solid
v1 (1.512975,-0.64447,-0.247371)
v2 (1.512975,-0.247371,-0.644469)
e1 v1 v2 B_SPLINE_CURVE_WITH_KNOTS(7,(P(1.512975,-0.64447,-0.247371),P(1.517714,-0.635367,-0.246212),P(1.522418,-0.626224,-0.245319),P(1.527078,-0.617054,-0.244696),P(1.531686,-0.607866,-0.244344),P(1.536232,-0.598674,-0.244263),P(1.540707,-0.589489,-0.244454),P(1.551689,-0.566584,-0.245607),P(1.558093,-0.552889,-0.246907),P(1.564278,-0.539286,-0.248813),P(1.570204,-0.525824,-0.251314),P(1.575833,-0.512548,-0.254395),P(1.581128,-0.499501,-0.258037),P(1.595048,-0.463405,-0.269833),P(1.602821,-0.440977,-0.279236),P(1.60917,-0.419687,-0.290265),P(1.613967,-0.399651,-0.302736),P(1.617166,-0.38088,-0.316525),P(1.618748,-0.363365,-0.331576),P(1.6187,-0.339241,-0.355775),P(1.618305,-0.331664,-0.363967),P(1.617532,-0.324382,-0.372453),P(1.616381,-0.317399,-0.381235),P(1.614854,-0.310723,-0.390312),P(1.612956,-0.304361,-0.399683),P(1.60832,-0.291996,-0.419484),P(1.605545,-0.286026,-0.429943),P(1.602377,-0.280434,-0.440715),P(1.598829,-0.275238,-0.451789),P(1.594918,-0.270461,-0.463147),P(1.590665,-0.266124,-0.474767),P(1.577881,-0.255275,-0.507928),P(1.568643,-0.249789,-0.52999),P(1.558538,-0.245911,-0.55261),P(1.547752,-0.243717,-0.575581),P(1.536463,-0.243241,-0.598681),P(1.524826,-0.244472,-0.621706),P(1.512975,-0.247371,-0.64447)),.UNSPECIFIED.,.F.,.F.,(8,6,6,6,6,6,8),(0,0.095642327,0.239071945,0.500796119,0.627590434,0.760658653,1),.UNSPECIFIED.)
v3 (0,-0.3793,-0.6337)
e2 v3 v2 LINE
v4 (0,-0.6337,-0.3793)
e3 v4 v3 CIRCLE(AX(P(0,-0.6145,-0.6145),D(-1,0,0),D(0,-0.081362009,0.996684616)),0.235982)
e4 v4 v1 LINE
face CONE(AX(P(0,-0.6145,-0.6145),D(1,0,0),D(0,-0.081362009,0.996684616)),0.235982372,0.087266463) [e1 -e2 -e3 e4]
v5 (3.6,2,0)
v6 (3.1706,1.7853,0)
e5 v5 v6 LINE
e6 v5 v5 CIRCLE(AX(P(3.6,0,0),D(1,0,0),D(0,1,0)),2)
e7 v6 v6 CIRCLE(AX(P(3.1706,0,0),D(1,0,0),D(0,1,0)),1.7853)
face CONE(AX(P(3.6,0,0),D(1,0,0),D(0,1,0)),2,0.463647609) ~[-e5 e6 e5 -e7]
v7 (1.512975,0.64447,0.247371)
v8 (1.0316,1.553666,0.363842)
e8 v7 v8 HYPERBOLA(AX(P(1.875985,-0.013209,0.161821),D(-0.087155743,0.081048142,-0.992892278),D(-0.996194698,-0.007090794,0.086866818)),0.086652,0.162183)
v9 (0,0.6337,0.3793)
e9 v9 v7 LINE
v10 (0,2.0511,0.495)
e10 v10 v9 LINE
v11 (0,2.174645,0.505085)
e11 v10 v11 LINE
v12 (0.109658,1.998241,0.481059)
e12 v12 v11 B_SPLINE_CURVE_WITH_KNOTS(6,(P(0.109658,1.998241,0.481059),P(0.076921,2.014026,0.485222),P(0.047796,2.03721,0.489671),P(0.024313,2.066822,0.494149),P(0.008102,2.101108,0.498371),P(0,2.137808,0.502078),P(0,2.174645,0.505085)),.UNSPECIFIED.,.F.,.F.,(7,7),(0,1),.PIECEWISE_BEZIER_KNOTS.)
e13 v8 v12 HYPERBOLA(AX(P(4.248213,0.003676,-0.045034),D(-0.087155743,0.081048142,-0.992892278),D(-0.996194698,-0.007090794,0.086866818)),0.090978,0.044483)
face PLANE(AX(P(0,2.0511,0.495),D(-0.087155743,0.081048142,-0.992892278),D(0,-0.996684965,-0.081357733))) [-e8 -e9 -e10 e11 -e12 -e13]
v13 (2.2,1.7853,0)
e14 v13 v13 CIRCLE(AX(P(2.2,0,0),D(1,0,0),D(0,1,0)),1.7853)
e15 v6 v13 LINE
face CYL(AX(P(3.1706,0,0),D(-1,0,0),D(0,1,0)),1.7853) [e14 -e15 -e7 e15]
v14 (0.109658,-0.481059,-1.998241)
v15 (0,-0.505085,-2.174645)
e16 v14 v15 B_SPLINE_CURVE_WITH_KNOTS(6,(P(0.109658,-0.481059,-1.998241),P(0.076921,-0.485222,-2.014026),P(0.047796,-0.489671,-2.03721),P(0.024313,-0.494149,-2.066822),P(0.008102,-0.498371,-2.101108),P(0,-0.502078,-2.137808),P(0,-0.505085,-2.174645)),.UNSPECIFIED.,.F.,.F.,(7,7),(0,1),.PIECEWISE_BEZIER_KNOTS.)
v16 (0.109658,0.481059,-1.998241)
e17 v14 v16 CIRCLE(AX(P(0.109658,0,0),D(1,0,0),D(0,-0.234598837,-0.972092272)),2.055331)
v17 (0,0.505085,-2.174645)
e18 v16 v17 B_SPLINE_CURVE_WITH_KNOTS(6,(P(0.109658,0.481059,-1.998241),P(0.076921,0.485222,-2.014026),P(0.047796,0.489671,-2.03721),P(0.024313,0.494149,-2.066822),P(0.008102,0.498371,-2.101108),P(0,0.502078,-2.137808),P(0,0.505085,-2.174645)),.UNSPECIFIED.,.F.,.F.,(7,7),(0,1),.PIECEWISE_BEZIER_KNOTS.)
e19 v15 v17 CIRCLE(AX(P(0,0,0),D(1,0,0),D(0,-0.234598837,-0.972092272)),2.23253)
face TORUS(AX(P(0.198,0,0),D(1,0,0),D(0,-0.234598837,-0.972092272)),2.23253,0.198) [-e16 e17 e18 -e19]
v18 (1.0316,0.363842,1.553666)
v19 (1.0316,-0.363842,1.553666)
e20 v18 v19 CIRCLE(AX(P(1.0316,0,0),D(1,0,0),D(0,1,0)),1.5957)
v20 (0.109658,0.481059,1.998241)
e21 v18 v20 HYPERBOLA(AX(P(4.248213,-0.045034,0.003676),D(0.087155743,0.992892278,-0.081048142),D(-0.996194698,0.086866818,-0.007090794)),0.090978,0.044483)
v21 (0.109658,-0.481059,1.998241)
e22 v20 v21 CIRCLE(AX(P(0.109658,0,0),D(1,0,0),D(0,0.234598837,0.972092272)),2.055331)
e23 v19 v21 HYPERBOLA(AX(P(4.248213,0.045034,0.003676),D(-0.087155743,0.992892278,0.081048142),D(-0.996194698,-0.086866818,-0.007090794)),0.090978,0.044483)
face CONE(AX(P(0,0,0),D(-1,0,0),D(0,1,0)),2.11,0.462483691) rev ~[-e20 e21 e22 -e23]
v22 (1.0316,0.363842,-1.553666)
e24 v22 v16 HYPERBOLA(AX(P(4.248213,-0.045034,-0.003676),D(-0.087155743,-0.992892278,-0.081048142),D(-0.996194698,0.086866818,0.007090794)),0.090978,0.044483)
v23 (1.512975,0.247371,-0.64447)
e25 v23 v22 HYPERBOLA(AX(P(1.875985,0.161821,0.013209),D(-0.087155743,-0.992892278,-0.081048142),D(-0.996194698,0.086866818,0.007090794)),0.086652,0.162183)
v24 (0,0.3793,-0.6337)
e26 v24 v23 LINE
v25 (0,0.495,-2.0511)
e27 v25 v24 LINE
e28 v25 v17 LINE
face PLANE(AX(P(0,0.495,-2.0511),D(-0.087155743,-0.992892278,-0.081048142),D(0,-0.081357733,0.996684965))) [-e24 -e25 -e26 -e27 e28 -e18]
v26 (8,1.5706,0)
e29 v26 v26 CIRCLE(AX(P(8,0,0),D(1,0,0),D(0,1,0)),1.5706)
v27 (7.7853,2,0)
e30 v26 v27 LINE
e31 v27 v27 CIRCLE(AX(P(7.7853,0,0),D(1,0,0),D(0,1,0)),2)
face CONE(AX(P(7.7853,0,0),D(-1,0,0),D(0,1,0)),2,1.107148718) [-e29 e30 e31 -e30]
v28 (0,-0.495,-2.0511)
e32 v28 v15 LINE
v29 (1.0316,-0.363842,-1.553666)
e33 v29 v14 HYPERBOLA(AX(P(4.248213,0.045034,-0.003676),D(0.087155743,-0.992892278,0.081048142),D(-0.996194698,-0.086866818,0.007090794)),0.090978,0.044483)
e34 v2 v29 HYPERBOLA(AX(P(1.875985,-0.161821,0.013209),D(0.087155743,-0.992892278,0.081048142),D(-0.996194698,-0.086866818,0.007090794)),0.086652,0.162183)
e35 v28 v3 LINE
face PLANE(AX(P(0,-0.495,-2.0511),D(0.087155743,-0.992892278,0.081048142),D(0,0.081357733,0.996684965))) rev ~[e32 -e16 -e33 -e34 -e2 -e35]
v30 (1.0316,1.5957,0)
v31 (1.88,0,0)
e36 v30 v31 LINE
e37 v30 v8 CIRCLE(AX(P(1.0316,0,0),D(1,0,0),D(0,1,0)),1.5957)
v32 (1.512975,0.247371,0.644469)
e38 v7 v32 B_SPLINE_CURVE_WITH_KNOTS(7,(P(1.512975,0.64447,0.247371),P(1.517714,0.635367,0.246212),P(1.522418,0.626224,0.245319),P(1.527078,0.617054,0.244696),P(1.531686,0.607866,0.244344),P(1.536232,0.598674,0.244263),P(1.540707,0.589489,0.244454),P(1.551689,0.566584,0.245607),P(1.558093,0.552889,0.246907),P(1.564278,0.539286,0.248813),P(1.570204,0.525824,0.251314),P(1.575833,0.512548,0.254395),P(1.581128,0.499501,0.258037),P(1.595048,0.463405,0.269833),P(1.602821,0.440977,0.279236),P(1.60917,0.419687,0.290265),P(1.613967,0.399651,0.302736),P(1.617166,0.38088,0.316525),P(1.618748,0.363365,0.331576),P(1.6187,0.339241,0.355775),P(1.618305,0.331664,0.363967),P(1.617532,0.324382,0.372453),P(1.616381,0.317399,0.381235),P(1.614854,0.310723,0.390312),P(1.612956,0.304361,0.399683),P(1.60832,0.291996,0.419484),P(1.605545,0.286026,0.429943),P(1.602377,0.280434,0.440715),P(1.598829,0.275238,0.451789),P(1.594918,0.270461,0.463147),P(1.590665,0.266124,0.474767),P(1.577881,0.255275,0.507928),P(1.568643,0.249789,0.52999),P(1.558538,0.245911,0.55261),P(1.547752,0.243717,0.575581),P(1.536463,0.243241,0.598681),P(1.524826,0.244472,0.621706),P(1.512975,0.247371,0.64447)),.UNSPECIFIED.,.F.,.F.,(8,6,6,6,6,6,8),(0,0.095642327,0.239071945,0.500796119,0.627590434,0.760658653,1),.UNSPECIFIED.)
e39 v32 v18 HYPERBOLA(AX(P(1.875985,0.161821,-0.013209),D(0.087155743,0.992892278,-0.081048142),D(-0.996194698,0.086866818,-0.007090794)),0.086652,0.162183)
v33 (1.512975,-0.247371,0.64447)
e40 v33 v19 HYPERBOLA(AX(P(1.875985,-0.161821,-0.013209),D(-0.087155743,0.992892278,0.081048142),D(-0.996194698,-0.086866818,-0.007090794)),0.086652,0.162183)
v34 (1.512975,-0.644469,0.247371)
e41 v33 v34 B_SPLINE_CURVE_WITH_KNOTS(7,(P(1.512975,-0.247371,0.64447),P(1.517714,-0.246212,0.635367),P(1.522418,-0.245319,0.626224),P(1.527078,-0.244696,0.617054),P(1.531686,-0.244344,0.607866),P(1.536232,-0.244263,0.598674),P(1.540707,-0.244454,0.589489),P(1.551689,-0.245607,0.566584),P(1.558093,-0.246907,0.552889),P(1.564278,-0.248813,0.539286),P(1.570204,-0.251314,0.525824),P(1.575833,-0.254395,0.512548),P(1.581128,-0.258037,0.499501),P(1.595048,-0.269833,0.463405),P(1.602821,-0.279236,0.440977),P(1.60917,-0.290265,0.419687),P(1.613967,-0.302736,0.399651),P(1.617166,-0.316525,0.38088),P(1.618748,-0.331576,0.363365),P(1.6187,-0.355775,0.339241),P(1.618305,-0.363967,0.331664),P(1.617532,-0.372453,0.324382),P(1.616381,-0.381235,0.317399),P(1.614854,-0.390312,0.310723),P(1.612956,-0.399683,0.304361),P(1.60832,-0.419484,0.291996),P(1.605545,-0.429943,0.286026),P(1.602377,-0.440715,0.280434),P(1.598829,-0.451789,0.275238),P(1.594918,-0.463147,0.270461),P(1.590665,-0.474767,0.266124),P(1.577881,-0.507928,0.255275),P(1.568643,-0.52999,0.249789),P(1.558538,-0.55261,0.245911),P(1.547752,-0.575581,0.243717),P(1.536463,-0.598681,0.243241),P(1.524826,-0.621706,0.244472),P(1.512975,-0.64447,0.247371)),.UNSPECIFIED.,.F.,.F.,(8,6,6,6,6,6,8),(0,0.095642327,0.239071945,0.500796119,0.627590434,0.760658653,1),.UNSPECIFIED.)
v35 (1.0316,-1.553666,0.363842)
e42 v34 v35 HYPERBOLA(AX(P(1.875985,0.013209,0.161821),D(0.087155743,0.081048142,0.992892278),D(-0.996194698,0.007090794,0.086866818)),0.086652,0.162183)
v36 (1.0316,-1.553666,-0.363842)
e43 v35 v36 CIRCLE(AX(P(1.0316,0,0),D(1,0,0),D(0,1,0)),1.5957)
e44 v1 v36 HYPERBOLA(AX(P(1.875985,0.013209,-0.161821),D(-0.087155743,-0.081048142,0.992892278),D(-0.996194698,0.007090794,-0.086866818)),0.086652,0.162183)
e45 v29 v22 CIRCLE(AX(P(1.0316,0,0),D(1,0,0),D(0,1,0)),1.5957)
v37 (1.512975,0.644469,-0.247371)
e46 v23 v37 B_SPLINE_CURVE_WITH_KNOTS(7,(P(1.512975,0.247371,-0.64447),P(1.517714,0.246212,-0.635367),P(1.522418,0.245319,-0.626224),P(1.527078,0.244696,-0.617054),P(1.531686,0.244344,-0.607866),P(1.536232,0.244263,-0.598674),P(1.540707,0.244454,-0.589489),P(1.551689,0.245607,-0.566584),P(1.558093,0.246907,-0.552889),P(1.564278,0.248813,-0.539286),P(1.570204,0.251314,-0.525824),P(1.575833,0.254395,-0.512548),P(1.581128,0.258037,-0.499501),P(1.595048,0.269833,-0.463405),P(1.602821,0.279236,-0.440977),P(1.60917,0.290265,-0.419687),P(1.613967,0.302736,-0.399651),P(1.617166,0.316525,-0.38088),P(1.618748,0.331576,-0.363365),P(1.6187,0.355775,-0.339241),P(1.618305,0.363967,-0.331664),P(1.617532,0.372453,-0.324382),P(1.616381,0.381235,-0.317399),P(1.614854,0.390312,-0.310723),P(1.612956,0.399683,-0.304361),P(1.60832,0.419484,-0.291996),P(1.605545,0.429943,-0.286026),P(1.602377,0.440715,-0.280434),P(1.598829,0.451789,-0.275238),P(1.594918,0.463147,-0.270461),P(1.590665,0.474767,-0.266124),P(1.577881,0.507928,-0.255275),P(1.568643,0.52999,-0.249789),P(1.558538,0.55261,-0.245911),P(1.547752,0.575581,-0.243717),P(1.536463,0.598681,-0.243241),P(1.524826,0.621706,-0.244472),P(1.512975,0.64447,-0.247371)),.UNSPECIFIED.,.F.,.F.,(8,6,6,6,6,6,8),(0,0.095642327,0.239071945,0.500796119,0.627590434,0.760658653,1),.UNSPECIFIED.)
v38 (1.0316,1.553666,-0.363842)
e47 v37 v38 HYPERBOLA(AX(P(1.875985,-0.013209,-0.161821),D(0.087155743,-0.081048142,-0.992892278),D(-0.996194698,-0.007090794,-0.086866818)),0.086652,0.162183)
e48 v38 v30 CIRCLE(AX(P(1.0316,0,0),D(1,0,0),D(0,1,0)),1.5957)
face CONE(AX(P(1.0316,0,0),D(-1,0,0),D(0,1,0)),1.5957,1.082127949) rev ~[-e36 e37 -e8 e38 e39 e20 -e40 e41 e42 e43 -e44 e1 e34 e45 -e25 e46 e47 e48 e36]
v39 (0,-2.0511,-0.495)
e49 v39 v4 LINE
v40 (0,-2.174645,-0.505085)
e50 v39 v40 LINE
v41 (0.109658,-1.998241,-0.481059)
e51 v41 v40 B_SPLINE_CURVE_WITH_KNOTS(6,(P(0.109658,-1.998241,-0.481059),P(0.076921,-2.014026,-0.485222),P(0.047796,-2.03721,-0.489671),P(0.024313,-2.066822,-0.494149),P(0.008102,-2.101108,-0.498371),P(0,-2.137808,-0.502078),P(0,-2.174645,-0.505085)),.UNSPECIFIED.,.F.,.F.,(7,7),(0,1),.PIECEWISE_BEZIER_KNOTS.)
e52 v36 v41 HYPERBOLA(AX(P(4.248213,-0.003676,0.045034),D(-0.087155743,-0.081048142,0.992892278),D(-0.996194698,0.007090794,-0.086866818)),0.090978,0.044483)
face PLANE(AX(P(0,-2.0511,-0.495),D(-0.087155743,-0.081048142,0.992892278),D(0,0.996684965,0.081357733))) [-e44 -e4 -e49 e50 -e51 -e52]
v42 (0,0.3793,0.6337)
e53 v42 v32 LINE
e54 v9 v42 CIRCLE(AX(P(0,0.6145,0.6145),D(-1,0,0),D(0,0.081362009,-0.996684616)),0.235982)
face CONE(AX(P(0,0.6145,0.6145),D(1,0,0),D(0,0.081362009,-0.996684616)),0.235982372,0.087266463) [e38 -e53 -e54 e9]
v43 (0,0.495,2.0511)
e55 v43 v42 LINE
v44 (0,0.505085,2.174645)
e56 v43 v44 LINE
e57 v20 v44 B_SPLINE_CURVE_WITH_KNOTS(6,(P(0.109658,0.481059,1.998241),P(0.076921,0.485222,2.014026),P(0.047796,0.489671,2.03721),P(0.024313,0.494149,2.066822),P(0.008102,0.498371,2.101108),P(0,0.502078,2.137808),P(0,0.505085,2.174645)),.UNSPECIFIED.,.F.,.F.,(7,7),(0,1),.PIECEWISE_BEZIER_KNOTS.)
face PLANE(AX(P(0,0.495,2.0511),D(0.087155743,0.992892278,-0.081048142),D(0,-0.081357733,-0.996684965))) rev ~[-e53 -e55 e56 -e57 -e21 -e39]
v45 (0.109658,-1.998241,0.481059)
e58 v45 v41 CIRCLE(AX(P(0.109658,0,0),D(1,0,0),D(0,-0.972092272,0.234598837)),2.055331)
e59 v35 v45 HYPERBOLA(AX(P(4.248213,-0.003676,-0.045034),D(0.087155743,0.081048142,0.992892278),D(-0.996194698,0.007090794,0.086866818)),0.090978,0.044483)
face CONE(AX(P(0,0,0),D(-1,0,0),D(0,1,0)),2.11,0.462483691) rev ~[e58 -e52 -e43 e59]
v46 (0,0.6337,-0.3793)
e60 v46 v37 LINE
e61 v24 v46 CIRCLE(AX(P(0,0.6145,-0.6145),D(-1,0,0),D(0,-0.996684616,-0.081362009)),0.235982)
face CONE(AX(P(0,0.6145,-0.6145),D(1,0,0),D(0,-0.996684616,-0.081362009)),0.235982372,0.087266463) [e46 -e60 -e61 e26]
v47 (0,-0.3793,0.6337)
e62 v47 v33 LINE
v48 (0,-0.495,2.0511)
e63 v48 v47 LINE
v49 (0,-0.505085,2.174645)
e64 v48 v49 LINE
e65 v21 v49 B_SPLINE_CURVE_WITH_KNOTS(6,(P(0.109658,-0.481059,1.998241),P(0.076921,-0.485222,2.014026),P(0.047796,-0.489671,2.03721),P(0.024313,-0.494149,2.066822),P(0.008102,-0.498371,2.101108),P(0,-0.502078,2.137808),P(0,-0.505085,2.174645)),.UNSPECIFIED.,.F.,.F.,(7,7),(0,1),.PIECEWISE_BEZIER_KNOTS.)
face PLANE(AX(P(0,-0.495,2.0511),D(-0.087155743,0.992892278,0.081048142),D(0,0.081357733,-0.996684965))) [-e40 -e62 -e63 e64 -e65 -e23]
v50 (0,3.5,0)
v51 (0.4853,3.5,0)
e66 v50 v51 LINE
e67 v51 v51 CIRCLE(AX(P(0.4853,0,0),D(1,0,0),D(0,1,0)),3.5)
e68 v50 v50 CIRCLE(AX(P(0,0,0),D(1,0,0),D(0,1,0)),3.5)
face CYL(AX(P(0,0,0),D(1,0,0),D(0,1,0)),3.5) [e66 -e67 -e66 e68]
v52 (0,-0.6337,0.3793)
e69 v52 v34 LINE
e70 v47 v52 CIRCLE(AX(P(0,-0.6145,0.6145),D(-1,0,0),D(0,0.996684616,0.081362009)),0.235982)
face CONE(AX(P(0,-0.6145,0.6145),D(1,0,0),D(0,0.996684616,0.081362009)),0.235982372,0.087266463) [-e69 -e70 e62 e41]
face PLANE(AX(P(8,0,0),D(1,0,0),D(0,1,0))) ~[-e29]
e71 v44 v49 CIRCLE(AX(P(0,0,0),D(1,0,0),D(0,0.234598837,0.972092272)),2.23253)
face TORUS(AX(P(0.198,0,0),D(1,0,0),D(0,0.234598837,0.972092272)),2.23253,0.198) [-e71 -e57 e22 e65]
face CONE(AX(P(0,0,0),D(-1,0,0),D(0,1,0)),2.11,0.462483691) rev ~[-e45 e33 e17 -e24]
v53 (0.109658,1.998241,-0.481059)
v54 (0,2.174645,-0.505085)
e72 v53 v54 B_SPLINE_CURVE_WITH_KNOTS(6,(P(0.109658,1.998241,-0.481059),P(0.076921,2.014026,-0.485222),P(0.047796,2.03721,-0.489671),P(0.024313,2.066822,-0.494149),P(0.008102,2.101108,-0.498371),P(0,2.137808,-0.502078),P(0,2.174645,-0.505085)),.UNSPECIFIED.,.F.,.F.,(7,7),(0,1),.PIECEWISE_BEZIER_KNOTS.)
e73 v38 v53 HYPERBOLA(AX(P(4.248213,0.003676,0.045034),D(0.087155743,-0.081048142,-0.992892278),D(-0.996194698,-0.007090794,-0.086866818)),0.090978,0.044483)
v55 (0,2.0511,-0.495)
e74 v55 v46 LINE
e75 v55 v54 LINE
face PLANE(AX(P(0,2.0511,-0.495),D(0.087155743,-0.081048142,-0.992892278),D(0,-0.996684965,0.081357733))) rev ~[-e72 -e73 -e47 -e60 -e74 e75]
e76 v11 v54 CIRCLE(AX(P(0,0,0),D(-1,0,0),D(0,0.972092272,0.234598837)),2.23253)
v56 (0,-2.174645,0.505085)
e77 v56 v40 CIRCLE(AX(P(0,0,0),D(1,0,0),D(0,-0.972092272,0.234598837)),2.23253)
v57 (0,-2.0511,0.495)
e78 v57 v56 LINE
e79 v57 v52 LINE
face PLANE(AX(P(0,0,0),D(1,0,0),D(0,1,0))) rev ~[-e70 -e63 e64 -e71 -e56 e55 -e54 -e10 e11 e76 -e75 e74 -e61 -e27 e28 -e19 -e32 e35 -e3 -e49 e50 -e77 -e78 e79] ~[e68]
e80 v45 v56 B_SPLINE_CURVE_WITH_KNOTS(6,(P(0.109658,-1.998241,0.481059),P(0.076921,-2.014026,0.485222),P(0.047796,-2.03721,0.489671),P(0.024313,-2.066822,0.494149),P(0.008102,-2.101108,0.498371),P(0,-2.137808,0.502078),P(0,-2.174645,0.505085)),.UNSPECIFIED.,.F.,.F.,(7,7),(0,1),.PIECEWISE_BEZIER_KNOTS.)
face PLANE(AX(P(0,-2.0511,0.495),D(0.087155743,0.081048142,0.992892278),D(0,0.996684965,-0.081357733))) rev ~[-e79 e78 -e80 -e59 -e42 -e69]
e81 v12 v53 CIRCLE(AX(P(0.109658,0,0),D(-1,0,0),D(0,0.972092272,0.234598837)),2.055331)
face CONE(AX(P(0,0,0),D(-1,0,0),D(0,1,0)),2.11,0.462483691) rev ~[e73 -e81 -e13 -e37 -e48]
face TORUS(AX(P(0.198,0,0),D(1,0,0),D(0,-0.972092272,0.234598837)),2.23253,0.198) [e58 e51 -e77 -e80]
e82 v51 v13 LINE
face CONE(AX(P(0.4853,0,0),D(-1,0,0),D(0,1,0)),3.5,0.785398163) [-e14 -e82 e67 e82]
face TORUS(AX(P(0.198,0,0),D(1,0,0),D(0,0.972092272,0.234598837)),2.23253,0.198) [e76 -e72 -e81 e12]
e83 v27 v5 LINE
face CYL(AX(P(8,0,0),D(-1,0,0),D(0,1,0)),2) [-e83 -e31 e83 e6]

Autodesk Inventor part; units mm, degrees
ref_plane "YZ Plane" through (0, 0, 0) normal (1, 0, 0) x (0, 1, 0)
ref_plane "XZ Plane" through (0, 0, 0) normal (0, 1, 0) x (-1, 0, 0)
sketch "Sketch1" plane through (0, 0, 0) normal (0, 0, 1) x (1, 0, 0)
  line L0 (1.88, 0) -> (8, 0)
  line L1 (8, 0) -> (8, 2)
  line L2 (8, 2) -> (3.6, 2)
  line L3 (3.6, 2) -> (3.1706, 1.7853)
  line L4 (3.1706, 1.7853) -> (2.2, 1.7853)
  line L5 (0, 3.5) -> (0, 2.11)
  line L6 (0, 2.11) -> (1.0316, 1.5957)
  line L7 (1.0316, 1.5957) -> (1.88, 0)
  line L8 (-1.6, 0) -> (9.6, 0) projected
  line L9 (0, -0.7) -> (0, 4.2) projected
  line L10 (0, 3.5) -> (0.4853, 3.5)
  line L11 (0.4853, 3.5) -> (2.2, 1.7853)
  line L12 (3.6, 2) -> (1.9853, 2) construction
  dimension "d1" = 4.4
  dimension "d2" = 4
  dimension "d3" = 3.5706
  dimension "d4" = 4.22
  dimension "d5" = 26.5
  dimension "d6" = 62
  dimension "d7" = 1.88
  dimension "d8" = 0.4294
  dimension "d12" = 7
  dimension "d13" = 45
  dimension "d15" = 8
  dimension "d24" = 2.2
revolve "Body" add sketch "Sketch1" angle 360 about axis through (1.88, 0, 0) along (1, 0, 0) contours L7 L6 L5 L10 L11 L4 L3 L2 L1 L0
sketch "Sketch2" plane through (0, 0, 0) normal (-1, 0, 0) x (0, 0, 1)
  line L0 (0, 2.11) -> (0, 0) construction
  line L1 (0, 0) -> (2.11, 0) construction
  arc A0 (0.633, 0) -> (0, 0.633) centre (0, 0) ccw construction
  arc A1 (0.7385, 0) -> (0, 0.7385) centre (0, 0) ccw construction
  arc A2 (2.0511, 0.495) -> (0.495, 2.0511) centre (0, 0) ccw
  line L2 (0, 0) -> (1.492, 1.492) construction
  line L3 (0.495, 2.0511) -> (0.3793, 0.6337)
  line L4 (2.0511, 0.495) -> (0.6337, 0.3793)
  arc A3 (0.495, 2.0511) -> (0, 2.11) centre (0, 0) ccw
  arc A4 (2.11, 0) -> (2.0511, 0.495) centre (0, 0) ccw
  line L5 (0, -4.9) -> (0, 4.9) projected
  line L6 (-4.9, 0) -> (4.9, 0) projected
  arc A5 (0.495, -2.0511) -> (2.0511, -0.495) centre (0, 0) ccw
  line L7 (0.495, -2.0511) -> (0.3793, -0.6337)
  line L8 (2.0511, -0.495) -> (0.6337, -0.3793)
  arc A6 (0, -2.11) -> (0.495, -2.0511) centre (0, 0) ccw
  arc A7 (2.0511, -0.495) -> (2.11, 0) centre (0, 0) ccw
  arc A8 (-0.495, 2.0511) -> (-2.0511, 0.495) centre (0, 0) ccw
  line L9 (-0.495, 2.0511) -> (-0.3793, 0.6337)
  line L10 (-2.0511, 0.495) -> (-0.6337, 0.3793)
  arc A9 (0, 2.11) -> (-0.495, 2.0511) centre (0, 0) ccw
  arc A10 (-2.0511, 0.495) -> (-2.11, 0) centre (0, 0) ccw
  arc A11 (-0.495, -2.0511) -> (0, -2.11) centre (0, 0) ccw
  arc A12 (-2.0511, -0.495) -> (-0.495, -2.0511) centre (0, 0) ccw
  arc A13 (-2.11, 0) -> (-2.0511, -0.495) centre (0, 0) ccw
  line L11 (-2.0511, -0.495) -> (-0.6337, -0.3793)
  line L12 (-0.495, -2.0511) -> (-0.3793, -0.6337)
  arc A14 (0.3793, 0.6337) -> (0.6337, 0.3793) centre (0.6145, 0.6145) ccw
  arc A15 (0.6337, -0.3793) -> (0.3793, -0.6337) centre (0.6145, -0.6145) ccw
  arc A16 (-0.6337, 0.3793) -> (-0.3793, 0.6337) centre (-0.6145, 0.6145) ccw
  arc A17 (-0.3793, -0.6337) -> (-0.6337, -0.3793) centre (-0.6145, -0.6145) ccw
  point P0 (1.492, -1.492)
  point P1 (-1.492, 1.492)
  point P2 (-1.492, -1.492)
  dimension "d17" = 1.266
  dimension "d18" = 1.477
  dimension "d19" = 4.22
  dimension "d20" = 45
  dimension "d21" = 0.495
extrude "Slot" add sketch "Sketch2" against normal up to next draft 5 contours L4 A14 L3 A2 | A5 L7 A15 L8 | L9 A16 L10 A8 | A12 L11 A17 L12
fillet "Fillet1" radius 0.198 4 edges at (0, 2.11, 0) (0, 0, -2.11) (0, -2.11, 0) (0, 0, 2.11)
thread "Thread" size "M4x0.7" class "6g" standard "ISO Metric profile" length 4.4
chamfer "Chamfer1" distance 0.4294 distance2 0.2147 1 edges at (8, -2, 0) measured on face at (8, -0.499, 0.4421)
ref_plane "Work Plane2" through (3.35, 0, 0) normal (0, 0, -1) x (1, 0, 0)
equation "\"d17\" = 0.3 * SDM"
equation "\"d18\" = 0.35 * SDM"
equation "\"d19\" = SDM"
equation "\"d21\" = 0.5 * SBR"
equation "\"d1\" = GEL"
equation "\"d2\" = GD"
equation "\"d3\" = BDM"
equation "\"d4\" = SDM"
equation "\"d7\" = INTI"
equation "\"d8\" = GAL"
equation "\"d12\" = KOD"
equation "\"d13\" = 0.5 * SEWI"
equation "\"d15\" = NLG"
equation "\"d24\" = KOH"
equation "\"d23\" = 0.2 * SBR"
equation "\"d10\" = GEL"
equation "\"d25\" = -0.5 * SPD + 0.5 * GD"
equation "\"d26\" = 0.5 * GAL"
equation "\"NLG\" = 8"
equation "\"GEL\" = 4.4"
equation "\"GAL\" = 0.61345 * PTC"
equation "\"SPD\" = NND - 1.2269 * PTC"
equation "\"KOD\" = 7"
equation "\"KOH\" = 2.2"
equation "\"SBR\" = 0.99"
equation "\"INTI\" = 1.88"
equation "\"SDM\" = 4.22"
equation "\"GD\" = NND"
equation "\"BDM\" = NND - GAL"
equation "\"SEWI\" = 90deg"
equation "\"d9\" = SDM"
equation "\"GUL\" = 0.61345 * PTC"
equation "\"TOA\" = 30deg"
equation "\"EPV\" = 4.2"
equation "\"THREADDIA\" = 4"
equation "\"RR\" = 0.4"
equation "\"PTC\" = 0.7"
equation "\"NND\" = 4"
equation "\"GD1\" = THREADDIA - 1.2269 * PTC"
properties part number "AS 1427 - M4 x 8" material "Steel, Mild"
